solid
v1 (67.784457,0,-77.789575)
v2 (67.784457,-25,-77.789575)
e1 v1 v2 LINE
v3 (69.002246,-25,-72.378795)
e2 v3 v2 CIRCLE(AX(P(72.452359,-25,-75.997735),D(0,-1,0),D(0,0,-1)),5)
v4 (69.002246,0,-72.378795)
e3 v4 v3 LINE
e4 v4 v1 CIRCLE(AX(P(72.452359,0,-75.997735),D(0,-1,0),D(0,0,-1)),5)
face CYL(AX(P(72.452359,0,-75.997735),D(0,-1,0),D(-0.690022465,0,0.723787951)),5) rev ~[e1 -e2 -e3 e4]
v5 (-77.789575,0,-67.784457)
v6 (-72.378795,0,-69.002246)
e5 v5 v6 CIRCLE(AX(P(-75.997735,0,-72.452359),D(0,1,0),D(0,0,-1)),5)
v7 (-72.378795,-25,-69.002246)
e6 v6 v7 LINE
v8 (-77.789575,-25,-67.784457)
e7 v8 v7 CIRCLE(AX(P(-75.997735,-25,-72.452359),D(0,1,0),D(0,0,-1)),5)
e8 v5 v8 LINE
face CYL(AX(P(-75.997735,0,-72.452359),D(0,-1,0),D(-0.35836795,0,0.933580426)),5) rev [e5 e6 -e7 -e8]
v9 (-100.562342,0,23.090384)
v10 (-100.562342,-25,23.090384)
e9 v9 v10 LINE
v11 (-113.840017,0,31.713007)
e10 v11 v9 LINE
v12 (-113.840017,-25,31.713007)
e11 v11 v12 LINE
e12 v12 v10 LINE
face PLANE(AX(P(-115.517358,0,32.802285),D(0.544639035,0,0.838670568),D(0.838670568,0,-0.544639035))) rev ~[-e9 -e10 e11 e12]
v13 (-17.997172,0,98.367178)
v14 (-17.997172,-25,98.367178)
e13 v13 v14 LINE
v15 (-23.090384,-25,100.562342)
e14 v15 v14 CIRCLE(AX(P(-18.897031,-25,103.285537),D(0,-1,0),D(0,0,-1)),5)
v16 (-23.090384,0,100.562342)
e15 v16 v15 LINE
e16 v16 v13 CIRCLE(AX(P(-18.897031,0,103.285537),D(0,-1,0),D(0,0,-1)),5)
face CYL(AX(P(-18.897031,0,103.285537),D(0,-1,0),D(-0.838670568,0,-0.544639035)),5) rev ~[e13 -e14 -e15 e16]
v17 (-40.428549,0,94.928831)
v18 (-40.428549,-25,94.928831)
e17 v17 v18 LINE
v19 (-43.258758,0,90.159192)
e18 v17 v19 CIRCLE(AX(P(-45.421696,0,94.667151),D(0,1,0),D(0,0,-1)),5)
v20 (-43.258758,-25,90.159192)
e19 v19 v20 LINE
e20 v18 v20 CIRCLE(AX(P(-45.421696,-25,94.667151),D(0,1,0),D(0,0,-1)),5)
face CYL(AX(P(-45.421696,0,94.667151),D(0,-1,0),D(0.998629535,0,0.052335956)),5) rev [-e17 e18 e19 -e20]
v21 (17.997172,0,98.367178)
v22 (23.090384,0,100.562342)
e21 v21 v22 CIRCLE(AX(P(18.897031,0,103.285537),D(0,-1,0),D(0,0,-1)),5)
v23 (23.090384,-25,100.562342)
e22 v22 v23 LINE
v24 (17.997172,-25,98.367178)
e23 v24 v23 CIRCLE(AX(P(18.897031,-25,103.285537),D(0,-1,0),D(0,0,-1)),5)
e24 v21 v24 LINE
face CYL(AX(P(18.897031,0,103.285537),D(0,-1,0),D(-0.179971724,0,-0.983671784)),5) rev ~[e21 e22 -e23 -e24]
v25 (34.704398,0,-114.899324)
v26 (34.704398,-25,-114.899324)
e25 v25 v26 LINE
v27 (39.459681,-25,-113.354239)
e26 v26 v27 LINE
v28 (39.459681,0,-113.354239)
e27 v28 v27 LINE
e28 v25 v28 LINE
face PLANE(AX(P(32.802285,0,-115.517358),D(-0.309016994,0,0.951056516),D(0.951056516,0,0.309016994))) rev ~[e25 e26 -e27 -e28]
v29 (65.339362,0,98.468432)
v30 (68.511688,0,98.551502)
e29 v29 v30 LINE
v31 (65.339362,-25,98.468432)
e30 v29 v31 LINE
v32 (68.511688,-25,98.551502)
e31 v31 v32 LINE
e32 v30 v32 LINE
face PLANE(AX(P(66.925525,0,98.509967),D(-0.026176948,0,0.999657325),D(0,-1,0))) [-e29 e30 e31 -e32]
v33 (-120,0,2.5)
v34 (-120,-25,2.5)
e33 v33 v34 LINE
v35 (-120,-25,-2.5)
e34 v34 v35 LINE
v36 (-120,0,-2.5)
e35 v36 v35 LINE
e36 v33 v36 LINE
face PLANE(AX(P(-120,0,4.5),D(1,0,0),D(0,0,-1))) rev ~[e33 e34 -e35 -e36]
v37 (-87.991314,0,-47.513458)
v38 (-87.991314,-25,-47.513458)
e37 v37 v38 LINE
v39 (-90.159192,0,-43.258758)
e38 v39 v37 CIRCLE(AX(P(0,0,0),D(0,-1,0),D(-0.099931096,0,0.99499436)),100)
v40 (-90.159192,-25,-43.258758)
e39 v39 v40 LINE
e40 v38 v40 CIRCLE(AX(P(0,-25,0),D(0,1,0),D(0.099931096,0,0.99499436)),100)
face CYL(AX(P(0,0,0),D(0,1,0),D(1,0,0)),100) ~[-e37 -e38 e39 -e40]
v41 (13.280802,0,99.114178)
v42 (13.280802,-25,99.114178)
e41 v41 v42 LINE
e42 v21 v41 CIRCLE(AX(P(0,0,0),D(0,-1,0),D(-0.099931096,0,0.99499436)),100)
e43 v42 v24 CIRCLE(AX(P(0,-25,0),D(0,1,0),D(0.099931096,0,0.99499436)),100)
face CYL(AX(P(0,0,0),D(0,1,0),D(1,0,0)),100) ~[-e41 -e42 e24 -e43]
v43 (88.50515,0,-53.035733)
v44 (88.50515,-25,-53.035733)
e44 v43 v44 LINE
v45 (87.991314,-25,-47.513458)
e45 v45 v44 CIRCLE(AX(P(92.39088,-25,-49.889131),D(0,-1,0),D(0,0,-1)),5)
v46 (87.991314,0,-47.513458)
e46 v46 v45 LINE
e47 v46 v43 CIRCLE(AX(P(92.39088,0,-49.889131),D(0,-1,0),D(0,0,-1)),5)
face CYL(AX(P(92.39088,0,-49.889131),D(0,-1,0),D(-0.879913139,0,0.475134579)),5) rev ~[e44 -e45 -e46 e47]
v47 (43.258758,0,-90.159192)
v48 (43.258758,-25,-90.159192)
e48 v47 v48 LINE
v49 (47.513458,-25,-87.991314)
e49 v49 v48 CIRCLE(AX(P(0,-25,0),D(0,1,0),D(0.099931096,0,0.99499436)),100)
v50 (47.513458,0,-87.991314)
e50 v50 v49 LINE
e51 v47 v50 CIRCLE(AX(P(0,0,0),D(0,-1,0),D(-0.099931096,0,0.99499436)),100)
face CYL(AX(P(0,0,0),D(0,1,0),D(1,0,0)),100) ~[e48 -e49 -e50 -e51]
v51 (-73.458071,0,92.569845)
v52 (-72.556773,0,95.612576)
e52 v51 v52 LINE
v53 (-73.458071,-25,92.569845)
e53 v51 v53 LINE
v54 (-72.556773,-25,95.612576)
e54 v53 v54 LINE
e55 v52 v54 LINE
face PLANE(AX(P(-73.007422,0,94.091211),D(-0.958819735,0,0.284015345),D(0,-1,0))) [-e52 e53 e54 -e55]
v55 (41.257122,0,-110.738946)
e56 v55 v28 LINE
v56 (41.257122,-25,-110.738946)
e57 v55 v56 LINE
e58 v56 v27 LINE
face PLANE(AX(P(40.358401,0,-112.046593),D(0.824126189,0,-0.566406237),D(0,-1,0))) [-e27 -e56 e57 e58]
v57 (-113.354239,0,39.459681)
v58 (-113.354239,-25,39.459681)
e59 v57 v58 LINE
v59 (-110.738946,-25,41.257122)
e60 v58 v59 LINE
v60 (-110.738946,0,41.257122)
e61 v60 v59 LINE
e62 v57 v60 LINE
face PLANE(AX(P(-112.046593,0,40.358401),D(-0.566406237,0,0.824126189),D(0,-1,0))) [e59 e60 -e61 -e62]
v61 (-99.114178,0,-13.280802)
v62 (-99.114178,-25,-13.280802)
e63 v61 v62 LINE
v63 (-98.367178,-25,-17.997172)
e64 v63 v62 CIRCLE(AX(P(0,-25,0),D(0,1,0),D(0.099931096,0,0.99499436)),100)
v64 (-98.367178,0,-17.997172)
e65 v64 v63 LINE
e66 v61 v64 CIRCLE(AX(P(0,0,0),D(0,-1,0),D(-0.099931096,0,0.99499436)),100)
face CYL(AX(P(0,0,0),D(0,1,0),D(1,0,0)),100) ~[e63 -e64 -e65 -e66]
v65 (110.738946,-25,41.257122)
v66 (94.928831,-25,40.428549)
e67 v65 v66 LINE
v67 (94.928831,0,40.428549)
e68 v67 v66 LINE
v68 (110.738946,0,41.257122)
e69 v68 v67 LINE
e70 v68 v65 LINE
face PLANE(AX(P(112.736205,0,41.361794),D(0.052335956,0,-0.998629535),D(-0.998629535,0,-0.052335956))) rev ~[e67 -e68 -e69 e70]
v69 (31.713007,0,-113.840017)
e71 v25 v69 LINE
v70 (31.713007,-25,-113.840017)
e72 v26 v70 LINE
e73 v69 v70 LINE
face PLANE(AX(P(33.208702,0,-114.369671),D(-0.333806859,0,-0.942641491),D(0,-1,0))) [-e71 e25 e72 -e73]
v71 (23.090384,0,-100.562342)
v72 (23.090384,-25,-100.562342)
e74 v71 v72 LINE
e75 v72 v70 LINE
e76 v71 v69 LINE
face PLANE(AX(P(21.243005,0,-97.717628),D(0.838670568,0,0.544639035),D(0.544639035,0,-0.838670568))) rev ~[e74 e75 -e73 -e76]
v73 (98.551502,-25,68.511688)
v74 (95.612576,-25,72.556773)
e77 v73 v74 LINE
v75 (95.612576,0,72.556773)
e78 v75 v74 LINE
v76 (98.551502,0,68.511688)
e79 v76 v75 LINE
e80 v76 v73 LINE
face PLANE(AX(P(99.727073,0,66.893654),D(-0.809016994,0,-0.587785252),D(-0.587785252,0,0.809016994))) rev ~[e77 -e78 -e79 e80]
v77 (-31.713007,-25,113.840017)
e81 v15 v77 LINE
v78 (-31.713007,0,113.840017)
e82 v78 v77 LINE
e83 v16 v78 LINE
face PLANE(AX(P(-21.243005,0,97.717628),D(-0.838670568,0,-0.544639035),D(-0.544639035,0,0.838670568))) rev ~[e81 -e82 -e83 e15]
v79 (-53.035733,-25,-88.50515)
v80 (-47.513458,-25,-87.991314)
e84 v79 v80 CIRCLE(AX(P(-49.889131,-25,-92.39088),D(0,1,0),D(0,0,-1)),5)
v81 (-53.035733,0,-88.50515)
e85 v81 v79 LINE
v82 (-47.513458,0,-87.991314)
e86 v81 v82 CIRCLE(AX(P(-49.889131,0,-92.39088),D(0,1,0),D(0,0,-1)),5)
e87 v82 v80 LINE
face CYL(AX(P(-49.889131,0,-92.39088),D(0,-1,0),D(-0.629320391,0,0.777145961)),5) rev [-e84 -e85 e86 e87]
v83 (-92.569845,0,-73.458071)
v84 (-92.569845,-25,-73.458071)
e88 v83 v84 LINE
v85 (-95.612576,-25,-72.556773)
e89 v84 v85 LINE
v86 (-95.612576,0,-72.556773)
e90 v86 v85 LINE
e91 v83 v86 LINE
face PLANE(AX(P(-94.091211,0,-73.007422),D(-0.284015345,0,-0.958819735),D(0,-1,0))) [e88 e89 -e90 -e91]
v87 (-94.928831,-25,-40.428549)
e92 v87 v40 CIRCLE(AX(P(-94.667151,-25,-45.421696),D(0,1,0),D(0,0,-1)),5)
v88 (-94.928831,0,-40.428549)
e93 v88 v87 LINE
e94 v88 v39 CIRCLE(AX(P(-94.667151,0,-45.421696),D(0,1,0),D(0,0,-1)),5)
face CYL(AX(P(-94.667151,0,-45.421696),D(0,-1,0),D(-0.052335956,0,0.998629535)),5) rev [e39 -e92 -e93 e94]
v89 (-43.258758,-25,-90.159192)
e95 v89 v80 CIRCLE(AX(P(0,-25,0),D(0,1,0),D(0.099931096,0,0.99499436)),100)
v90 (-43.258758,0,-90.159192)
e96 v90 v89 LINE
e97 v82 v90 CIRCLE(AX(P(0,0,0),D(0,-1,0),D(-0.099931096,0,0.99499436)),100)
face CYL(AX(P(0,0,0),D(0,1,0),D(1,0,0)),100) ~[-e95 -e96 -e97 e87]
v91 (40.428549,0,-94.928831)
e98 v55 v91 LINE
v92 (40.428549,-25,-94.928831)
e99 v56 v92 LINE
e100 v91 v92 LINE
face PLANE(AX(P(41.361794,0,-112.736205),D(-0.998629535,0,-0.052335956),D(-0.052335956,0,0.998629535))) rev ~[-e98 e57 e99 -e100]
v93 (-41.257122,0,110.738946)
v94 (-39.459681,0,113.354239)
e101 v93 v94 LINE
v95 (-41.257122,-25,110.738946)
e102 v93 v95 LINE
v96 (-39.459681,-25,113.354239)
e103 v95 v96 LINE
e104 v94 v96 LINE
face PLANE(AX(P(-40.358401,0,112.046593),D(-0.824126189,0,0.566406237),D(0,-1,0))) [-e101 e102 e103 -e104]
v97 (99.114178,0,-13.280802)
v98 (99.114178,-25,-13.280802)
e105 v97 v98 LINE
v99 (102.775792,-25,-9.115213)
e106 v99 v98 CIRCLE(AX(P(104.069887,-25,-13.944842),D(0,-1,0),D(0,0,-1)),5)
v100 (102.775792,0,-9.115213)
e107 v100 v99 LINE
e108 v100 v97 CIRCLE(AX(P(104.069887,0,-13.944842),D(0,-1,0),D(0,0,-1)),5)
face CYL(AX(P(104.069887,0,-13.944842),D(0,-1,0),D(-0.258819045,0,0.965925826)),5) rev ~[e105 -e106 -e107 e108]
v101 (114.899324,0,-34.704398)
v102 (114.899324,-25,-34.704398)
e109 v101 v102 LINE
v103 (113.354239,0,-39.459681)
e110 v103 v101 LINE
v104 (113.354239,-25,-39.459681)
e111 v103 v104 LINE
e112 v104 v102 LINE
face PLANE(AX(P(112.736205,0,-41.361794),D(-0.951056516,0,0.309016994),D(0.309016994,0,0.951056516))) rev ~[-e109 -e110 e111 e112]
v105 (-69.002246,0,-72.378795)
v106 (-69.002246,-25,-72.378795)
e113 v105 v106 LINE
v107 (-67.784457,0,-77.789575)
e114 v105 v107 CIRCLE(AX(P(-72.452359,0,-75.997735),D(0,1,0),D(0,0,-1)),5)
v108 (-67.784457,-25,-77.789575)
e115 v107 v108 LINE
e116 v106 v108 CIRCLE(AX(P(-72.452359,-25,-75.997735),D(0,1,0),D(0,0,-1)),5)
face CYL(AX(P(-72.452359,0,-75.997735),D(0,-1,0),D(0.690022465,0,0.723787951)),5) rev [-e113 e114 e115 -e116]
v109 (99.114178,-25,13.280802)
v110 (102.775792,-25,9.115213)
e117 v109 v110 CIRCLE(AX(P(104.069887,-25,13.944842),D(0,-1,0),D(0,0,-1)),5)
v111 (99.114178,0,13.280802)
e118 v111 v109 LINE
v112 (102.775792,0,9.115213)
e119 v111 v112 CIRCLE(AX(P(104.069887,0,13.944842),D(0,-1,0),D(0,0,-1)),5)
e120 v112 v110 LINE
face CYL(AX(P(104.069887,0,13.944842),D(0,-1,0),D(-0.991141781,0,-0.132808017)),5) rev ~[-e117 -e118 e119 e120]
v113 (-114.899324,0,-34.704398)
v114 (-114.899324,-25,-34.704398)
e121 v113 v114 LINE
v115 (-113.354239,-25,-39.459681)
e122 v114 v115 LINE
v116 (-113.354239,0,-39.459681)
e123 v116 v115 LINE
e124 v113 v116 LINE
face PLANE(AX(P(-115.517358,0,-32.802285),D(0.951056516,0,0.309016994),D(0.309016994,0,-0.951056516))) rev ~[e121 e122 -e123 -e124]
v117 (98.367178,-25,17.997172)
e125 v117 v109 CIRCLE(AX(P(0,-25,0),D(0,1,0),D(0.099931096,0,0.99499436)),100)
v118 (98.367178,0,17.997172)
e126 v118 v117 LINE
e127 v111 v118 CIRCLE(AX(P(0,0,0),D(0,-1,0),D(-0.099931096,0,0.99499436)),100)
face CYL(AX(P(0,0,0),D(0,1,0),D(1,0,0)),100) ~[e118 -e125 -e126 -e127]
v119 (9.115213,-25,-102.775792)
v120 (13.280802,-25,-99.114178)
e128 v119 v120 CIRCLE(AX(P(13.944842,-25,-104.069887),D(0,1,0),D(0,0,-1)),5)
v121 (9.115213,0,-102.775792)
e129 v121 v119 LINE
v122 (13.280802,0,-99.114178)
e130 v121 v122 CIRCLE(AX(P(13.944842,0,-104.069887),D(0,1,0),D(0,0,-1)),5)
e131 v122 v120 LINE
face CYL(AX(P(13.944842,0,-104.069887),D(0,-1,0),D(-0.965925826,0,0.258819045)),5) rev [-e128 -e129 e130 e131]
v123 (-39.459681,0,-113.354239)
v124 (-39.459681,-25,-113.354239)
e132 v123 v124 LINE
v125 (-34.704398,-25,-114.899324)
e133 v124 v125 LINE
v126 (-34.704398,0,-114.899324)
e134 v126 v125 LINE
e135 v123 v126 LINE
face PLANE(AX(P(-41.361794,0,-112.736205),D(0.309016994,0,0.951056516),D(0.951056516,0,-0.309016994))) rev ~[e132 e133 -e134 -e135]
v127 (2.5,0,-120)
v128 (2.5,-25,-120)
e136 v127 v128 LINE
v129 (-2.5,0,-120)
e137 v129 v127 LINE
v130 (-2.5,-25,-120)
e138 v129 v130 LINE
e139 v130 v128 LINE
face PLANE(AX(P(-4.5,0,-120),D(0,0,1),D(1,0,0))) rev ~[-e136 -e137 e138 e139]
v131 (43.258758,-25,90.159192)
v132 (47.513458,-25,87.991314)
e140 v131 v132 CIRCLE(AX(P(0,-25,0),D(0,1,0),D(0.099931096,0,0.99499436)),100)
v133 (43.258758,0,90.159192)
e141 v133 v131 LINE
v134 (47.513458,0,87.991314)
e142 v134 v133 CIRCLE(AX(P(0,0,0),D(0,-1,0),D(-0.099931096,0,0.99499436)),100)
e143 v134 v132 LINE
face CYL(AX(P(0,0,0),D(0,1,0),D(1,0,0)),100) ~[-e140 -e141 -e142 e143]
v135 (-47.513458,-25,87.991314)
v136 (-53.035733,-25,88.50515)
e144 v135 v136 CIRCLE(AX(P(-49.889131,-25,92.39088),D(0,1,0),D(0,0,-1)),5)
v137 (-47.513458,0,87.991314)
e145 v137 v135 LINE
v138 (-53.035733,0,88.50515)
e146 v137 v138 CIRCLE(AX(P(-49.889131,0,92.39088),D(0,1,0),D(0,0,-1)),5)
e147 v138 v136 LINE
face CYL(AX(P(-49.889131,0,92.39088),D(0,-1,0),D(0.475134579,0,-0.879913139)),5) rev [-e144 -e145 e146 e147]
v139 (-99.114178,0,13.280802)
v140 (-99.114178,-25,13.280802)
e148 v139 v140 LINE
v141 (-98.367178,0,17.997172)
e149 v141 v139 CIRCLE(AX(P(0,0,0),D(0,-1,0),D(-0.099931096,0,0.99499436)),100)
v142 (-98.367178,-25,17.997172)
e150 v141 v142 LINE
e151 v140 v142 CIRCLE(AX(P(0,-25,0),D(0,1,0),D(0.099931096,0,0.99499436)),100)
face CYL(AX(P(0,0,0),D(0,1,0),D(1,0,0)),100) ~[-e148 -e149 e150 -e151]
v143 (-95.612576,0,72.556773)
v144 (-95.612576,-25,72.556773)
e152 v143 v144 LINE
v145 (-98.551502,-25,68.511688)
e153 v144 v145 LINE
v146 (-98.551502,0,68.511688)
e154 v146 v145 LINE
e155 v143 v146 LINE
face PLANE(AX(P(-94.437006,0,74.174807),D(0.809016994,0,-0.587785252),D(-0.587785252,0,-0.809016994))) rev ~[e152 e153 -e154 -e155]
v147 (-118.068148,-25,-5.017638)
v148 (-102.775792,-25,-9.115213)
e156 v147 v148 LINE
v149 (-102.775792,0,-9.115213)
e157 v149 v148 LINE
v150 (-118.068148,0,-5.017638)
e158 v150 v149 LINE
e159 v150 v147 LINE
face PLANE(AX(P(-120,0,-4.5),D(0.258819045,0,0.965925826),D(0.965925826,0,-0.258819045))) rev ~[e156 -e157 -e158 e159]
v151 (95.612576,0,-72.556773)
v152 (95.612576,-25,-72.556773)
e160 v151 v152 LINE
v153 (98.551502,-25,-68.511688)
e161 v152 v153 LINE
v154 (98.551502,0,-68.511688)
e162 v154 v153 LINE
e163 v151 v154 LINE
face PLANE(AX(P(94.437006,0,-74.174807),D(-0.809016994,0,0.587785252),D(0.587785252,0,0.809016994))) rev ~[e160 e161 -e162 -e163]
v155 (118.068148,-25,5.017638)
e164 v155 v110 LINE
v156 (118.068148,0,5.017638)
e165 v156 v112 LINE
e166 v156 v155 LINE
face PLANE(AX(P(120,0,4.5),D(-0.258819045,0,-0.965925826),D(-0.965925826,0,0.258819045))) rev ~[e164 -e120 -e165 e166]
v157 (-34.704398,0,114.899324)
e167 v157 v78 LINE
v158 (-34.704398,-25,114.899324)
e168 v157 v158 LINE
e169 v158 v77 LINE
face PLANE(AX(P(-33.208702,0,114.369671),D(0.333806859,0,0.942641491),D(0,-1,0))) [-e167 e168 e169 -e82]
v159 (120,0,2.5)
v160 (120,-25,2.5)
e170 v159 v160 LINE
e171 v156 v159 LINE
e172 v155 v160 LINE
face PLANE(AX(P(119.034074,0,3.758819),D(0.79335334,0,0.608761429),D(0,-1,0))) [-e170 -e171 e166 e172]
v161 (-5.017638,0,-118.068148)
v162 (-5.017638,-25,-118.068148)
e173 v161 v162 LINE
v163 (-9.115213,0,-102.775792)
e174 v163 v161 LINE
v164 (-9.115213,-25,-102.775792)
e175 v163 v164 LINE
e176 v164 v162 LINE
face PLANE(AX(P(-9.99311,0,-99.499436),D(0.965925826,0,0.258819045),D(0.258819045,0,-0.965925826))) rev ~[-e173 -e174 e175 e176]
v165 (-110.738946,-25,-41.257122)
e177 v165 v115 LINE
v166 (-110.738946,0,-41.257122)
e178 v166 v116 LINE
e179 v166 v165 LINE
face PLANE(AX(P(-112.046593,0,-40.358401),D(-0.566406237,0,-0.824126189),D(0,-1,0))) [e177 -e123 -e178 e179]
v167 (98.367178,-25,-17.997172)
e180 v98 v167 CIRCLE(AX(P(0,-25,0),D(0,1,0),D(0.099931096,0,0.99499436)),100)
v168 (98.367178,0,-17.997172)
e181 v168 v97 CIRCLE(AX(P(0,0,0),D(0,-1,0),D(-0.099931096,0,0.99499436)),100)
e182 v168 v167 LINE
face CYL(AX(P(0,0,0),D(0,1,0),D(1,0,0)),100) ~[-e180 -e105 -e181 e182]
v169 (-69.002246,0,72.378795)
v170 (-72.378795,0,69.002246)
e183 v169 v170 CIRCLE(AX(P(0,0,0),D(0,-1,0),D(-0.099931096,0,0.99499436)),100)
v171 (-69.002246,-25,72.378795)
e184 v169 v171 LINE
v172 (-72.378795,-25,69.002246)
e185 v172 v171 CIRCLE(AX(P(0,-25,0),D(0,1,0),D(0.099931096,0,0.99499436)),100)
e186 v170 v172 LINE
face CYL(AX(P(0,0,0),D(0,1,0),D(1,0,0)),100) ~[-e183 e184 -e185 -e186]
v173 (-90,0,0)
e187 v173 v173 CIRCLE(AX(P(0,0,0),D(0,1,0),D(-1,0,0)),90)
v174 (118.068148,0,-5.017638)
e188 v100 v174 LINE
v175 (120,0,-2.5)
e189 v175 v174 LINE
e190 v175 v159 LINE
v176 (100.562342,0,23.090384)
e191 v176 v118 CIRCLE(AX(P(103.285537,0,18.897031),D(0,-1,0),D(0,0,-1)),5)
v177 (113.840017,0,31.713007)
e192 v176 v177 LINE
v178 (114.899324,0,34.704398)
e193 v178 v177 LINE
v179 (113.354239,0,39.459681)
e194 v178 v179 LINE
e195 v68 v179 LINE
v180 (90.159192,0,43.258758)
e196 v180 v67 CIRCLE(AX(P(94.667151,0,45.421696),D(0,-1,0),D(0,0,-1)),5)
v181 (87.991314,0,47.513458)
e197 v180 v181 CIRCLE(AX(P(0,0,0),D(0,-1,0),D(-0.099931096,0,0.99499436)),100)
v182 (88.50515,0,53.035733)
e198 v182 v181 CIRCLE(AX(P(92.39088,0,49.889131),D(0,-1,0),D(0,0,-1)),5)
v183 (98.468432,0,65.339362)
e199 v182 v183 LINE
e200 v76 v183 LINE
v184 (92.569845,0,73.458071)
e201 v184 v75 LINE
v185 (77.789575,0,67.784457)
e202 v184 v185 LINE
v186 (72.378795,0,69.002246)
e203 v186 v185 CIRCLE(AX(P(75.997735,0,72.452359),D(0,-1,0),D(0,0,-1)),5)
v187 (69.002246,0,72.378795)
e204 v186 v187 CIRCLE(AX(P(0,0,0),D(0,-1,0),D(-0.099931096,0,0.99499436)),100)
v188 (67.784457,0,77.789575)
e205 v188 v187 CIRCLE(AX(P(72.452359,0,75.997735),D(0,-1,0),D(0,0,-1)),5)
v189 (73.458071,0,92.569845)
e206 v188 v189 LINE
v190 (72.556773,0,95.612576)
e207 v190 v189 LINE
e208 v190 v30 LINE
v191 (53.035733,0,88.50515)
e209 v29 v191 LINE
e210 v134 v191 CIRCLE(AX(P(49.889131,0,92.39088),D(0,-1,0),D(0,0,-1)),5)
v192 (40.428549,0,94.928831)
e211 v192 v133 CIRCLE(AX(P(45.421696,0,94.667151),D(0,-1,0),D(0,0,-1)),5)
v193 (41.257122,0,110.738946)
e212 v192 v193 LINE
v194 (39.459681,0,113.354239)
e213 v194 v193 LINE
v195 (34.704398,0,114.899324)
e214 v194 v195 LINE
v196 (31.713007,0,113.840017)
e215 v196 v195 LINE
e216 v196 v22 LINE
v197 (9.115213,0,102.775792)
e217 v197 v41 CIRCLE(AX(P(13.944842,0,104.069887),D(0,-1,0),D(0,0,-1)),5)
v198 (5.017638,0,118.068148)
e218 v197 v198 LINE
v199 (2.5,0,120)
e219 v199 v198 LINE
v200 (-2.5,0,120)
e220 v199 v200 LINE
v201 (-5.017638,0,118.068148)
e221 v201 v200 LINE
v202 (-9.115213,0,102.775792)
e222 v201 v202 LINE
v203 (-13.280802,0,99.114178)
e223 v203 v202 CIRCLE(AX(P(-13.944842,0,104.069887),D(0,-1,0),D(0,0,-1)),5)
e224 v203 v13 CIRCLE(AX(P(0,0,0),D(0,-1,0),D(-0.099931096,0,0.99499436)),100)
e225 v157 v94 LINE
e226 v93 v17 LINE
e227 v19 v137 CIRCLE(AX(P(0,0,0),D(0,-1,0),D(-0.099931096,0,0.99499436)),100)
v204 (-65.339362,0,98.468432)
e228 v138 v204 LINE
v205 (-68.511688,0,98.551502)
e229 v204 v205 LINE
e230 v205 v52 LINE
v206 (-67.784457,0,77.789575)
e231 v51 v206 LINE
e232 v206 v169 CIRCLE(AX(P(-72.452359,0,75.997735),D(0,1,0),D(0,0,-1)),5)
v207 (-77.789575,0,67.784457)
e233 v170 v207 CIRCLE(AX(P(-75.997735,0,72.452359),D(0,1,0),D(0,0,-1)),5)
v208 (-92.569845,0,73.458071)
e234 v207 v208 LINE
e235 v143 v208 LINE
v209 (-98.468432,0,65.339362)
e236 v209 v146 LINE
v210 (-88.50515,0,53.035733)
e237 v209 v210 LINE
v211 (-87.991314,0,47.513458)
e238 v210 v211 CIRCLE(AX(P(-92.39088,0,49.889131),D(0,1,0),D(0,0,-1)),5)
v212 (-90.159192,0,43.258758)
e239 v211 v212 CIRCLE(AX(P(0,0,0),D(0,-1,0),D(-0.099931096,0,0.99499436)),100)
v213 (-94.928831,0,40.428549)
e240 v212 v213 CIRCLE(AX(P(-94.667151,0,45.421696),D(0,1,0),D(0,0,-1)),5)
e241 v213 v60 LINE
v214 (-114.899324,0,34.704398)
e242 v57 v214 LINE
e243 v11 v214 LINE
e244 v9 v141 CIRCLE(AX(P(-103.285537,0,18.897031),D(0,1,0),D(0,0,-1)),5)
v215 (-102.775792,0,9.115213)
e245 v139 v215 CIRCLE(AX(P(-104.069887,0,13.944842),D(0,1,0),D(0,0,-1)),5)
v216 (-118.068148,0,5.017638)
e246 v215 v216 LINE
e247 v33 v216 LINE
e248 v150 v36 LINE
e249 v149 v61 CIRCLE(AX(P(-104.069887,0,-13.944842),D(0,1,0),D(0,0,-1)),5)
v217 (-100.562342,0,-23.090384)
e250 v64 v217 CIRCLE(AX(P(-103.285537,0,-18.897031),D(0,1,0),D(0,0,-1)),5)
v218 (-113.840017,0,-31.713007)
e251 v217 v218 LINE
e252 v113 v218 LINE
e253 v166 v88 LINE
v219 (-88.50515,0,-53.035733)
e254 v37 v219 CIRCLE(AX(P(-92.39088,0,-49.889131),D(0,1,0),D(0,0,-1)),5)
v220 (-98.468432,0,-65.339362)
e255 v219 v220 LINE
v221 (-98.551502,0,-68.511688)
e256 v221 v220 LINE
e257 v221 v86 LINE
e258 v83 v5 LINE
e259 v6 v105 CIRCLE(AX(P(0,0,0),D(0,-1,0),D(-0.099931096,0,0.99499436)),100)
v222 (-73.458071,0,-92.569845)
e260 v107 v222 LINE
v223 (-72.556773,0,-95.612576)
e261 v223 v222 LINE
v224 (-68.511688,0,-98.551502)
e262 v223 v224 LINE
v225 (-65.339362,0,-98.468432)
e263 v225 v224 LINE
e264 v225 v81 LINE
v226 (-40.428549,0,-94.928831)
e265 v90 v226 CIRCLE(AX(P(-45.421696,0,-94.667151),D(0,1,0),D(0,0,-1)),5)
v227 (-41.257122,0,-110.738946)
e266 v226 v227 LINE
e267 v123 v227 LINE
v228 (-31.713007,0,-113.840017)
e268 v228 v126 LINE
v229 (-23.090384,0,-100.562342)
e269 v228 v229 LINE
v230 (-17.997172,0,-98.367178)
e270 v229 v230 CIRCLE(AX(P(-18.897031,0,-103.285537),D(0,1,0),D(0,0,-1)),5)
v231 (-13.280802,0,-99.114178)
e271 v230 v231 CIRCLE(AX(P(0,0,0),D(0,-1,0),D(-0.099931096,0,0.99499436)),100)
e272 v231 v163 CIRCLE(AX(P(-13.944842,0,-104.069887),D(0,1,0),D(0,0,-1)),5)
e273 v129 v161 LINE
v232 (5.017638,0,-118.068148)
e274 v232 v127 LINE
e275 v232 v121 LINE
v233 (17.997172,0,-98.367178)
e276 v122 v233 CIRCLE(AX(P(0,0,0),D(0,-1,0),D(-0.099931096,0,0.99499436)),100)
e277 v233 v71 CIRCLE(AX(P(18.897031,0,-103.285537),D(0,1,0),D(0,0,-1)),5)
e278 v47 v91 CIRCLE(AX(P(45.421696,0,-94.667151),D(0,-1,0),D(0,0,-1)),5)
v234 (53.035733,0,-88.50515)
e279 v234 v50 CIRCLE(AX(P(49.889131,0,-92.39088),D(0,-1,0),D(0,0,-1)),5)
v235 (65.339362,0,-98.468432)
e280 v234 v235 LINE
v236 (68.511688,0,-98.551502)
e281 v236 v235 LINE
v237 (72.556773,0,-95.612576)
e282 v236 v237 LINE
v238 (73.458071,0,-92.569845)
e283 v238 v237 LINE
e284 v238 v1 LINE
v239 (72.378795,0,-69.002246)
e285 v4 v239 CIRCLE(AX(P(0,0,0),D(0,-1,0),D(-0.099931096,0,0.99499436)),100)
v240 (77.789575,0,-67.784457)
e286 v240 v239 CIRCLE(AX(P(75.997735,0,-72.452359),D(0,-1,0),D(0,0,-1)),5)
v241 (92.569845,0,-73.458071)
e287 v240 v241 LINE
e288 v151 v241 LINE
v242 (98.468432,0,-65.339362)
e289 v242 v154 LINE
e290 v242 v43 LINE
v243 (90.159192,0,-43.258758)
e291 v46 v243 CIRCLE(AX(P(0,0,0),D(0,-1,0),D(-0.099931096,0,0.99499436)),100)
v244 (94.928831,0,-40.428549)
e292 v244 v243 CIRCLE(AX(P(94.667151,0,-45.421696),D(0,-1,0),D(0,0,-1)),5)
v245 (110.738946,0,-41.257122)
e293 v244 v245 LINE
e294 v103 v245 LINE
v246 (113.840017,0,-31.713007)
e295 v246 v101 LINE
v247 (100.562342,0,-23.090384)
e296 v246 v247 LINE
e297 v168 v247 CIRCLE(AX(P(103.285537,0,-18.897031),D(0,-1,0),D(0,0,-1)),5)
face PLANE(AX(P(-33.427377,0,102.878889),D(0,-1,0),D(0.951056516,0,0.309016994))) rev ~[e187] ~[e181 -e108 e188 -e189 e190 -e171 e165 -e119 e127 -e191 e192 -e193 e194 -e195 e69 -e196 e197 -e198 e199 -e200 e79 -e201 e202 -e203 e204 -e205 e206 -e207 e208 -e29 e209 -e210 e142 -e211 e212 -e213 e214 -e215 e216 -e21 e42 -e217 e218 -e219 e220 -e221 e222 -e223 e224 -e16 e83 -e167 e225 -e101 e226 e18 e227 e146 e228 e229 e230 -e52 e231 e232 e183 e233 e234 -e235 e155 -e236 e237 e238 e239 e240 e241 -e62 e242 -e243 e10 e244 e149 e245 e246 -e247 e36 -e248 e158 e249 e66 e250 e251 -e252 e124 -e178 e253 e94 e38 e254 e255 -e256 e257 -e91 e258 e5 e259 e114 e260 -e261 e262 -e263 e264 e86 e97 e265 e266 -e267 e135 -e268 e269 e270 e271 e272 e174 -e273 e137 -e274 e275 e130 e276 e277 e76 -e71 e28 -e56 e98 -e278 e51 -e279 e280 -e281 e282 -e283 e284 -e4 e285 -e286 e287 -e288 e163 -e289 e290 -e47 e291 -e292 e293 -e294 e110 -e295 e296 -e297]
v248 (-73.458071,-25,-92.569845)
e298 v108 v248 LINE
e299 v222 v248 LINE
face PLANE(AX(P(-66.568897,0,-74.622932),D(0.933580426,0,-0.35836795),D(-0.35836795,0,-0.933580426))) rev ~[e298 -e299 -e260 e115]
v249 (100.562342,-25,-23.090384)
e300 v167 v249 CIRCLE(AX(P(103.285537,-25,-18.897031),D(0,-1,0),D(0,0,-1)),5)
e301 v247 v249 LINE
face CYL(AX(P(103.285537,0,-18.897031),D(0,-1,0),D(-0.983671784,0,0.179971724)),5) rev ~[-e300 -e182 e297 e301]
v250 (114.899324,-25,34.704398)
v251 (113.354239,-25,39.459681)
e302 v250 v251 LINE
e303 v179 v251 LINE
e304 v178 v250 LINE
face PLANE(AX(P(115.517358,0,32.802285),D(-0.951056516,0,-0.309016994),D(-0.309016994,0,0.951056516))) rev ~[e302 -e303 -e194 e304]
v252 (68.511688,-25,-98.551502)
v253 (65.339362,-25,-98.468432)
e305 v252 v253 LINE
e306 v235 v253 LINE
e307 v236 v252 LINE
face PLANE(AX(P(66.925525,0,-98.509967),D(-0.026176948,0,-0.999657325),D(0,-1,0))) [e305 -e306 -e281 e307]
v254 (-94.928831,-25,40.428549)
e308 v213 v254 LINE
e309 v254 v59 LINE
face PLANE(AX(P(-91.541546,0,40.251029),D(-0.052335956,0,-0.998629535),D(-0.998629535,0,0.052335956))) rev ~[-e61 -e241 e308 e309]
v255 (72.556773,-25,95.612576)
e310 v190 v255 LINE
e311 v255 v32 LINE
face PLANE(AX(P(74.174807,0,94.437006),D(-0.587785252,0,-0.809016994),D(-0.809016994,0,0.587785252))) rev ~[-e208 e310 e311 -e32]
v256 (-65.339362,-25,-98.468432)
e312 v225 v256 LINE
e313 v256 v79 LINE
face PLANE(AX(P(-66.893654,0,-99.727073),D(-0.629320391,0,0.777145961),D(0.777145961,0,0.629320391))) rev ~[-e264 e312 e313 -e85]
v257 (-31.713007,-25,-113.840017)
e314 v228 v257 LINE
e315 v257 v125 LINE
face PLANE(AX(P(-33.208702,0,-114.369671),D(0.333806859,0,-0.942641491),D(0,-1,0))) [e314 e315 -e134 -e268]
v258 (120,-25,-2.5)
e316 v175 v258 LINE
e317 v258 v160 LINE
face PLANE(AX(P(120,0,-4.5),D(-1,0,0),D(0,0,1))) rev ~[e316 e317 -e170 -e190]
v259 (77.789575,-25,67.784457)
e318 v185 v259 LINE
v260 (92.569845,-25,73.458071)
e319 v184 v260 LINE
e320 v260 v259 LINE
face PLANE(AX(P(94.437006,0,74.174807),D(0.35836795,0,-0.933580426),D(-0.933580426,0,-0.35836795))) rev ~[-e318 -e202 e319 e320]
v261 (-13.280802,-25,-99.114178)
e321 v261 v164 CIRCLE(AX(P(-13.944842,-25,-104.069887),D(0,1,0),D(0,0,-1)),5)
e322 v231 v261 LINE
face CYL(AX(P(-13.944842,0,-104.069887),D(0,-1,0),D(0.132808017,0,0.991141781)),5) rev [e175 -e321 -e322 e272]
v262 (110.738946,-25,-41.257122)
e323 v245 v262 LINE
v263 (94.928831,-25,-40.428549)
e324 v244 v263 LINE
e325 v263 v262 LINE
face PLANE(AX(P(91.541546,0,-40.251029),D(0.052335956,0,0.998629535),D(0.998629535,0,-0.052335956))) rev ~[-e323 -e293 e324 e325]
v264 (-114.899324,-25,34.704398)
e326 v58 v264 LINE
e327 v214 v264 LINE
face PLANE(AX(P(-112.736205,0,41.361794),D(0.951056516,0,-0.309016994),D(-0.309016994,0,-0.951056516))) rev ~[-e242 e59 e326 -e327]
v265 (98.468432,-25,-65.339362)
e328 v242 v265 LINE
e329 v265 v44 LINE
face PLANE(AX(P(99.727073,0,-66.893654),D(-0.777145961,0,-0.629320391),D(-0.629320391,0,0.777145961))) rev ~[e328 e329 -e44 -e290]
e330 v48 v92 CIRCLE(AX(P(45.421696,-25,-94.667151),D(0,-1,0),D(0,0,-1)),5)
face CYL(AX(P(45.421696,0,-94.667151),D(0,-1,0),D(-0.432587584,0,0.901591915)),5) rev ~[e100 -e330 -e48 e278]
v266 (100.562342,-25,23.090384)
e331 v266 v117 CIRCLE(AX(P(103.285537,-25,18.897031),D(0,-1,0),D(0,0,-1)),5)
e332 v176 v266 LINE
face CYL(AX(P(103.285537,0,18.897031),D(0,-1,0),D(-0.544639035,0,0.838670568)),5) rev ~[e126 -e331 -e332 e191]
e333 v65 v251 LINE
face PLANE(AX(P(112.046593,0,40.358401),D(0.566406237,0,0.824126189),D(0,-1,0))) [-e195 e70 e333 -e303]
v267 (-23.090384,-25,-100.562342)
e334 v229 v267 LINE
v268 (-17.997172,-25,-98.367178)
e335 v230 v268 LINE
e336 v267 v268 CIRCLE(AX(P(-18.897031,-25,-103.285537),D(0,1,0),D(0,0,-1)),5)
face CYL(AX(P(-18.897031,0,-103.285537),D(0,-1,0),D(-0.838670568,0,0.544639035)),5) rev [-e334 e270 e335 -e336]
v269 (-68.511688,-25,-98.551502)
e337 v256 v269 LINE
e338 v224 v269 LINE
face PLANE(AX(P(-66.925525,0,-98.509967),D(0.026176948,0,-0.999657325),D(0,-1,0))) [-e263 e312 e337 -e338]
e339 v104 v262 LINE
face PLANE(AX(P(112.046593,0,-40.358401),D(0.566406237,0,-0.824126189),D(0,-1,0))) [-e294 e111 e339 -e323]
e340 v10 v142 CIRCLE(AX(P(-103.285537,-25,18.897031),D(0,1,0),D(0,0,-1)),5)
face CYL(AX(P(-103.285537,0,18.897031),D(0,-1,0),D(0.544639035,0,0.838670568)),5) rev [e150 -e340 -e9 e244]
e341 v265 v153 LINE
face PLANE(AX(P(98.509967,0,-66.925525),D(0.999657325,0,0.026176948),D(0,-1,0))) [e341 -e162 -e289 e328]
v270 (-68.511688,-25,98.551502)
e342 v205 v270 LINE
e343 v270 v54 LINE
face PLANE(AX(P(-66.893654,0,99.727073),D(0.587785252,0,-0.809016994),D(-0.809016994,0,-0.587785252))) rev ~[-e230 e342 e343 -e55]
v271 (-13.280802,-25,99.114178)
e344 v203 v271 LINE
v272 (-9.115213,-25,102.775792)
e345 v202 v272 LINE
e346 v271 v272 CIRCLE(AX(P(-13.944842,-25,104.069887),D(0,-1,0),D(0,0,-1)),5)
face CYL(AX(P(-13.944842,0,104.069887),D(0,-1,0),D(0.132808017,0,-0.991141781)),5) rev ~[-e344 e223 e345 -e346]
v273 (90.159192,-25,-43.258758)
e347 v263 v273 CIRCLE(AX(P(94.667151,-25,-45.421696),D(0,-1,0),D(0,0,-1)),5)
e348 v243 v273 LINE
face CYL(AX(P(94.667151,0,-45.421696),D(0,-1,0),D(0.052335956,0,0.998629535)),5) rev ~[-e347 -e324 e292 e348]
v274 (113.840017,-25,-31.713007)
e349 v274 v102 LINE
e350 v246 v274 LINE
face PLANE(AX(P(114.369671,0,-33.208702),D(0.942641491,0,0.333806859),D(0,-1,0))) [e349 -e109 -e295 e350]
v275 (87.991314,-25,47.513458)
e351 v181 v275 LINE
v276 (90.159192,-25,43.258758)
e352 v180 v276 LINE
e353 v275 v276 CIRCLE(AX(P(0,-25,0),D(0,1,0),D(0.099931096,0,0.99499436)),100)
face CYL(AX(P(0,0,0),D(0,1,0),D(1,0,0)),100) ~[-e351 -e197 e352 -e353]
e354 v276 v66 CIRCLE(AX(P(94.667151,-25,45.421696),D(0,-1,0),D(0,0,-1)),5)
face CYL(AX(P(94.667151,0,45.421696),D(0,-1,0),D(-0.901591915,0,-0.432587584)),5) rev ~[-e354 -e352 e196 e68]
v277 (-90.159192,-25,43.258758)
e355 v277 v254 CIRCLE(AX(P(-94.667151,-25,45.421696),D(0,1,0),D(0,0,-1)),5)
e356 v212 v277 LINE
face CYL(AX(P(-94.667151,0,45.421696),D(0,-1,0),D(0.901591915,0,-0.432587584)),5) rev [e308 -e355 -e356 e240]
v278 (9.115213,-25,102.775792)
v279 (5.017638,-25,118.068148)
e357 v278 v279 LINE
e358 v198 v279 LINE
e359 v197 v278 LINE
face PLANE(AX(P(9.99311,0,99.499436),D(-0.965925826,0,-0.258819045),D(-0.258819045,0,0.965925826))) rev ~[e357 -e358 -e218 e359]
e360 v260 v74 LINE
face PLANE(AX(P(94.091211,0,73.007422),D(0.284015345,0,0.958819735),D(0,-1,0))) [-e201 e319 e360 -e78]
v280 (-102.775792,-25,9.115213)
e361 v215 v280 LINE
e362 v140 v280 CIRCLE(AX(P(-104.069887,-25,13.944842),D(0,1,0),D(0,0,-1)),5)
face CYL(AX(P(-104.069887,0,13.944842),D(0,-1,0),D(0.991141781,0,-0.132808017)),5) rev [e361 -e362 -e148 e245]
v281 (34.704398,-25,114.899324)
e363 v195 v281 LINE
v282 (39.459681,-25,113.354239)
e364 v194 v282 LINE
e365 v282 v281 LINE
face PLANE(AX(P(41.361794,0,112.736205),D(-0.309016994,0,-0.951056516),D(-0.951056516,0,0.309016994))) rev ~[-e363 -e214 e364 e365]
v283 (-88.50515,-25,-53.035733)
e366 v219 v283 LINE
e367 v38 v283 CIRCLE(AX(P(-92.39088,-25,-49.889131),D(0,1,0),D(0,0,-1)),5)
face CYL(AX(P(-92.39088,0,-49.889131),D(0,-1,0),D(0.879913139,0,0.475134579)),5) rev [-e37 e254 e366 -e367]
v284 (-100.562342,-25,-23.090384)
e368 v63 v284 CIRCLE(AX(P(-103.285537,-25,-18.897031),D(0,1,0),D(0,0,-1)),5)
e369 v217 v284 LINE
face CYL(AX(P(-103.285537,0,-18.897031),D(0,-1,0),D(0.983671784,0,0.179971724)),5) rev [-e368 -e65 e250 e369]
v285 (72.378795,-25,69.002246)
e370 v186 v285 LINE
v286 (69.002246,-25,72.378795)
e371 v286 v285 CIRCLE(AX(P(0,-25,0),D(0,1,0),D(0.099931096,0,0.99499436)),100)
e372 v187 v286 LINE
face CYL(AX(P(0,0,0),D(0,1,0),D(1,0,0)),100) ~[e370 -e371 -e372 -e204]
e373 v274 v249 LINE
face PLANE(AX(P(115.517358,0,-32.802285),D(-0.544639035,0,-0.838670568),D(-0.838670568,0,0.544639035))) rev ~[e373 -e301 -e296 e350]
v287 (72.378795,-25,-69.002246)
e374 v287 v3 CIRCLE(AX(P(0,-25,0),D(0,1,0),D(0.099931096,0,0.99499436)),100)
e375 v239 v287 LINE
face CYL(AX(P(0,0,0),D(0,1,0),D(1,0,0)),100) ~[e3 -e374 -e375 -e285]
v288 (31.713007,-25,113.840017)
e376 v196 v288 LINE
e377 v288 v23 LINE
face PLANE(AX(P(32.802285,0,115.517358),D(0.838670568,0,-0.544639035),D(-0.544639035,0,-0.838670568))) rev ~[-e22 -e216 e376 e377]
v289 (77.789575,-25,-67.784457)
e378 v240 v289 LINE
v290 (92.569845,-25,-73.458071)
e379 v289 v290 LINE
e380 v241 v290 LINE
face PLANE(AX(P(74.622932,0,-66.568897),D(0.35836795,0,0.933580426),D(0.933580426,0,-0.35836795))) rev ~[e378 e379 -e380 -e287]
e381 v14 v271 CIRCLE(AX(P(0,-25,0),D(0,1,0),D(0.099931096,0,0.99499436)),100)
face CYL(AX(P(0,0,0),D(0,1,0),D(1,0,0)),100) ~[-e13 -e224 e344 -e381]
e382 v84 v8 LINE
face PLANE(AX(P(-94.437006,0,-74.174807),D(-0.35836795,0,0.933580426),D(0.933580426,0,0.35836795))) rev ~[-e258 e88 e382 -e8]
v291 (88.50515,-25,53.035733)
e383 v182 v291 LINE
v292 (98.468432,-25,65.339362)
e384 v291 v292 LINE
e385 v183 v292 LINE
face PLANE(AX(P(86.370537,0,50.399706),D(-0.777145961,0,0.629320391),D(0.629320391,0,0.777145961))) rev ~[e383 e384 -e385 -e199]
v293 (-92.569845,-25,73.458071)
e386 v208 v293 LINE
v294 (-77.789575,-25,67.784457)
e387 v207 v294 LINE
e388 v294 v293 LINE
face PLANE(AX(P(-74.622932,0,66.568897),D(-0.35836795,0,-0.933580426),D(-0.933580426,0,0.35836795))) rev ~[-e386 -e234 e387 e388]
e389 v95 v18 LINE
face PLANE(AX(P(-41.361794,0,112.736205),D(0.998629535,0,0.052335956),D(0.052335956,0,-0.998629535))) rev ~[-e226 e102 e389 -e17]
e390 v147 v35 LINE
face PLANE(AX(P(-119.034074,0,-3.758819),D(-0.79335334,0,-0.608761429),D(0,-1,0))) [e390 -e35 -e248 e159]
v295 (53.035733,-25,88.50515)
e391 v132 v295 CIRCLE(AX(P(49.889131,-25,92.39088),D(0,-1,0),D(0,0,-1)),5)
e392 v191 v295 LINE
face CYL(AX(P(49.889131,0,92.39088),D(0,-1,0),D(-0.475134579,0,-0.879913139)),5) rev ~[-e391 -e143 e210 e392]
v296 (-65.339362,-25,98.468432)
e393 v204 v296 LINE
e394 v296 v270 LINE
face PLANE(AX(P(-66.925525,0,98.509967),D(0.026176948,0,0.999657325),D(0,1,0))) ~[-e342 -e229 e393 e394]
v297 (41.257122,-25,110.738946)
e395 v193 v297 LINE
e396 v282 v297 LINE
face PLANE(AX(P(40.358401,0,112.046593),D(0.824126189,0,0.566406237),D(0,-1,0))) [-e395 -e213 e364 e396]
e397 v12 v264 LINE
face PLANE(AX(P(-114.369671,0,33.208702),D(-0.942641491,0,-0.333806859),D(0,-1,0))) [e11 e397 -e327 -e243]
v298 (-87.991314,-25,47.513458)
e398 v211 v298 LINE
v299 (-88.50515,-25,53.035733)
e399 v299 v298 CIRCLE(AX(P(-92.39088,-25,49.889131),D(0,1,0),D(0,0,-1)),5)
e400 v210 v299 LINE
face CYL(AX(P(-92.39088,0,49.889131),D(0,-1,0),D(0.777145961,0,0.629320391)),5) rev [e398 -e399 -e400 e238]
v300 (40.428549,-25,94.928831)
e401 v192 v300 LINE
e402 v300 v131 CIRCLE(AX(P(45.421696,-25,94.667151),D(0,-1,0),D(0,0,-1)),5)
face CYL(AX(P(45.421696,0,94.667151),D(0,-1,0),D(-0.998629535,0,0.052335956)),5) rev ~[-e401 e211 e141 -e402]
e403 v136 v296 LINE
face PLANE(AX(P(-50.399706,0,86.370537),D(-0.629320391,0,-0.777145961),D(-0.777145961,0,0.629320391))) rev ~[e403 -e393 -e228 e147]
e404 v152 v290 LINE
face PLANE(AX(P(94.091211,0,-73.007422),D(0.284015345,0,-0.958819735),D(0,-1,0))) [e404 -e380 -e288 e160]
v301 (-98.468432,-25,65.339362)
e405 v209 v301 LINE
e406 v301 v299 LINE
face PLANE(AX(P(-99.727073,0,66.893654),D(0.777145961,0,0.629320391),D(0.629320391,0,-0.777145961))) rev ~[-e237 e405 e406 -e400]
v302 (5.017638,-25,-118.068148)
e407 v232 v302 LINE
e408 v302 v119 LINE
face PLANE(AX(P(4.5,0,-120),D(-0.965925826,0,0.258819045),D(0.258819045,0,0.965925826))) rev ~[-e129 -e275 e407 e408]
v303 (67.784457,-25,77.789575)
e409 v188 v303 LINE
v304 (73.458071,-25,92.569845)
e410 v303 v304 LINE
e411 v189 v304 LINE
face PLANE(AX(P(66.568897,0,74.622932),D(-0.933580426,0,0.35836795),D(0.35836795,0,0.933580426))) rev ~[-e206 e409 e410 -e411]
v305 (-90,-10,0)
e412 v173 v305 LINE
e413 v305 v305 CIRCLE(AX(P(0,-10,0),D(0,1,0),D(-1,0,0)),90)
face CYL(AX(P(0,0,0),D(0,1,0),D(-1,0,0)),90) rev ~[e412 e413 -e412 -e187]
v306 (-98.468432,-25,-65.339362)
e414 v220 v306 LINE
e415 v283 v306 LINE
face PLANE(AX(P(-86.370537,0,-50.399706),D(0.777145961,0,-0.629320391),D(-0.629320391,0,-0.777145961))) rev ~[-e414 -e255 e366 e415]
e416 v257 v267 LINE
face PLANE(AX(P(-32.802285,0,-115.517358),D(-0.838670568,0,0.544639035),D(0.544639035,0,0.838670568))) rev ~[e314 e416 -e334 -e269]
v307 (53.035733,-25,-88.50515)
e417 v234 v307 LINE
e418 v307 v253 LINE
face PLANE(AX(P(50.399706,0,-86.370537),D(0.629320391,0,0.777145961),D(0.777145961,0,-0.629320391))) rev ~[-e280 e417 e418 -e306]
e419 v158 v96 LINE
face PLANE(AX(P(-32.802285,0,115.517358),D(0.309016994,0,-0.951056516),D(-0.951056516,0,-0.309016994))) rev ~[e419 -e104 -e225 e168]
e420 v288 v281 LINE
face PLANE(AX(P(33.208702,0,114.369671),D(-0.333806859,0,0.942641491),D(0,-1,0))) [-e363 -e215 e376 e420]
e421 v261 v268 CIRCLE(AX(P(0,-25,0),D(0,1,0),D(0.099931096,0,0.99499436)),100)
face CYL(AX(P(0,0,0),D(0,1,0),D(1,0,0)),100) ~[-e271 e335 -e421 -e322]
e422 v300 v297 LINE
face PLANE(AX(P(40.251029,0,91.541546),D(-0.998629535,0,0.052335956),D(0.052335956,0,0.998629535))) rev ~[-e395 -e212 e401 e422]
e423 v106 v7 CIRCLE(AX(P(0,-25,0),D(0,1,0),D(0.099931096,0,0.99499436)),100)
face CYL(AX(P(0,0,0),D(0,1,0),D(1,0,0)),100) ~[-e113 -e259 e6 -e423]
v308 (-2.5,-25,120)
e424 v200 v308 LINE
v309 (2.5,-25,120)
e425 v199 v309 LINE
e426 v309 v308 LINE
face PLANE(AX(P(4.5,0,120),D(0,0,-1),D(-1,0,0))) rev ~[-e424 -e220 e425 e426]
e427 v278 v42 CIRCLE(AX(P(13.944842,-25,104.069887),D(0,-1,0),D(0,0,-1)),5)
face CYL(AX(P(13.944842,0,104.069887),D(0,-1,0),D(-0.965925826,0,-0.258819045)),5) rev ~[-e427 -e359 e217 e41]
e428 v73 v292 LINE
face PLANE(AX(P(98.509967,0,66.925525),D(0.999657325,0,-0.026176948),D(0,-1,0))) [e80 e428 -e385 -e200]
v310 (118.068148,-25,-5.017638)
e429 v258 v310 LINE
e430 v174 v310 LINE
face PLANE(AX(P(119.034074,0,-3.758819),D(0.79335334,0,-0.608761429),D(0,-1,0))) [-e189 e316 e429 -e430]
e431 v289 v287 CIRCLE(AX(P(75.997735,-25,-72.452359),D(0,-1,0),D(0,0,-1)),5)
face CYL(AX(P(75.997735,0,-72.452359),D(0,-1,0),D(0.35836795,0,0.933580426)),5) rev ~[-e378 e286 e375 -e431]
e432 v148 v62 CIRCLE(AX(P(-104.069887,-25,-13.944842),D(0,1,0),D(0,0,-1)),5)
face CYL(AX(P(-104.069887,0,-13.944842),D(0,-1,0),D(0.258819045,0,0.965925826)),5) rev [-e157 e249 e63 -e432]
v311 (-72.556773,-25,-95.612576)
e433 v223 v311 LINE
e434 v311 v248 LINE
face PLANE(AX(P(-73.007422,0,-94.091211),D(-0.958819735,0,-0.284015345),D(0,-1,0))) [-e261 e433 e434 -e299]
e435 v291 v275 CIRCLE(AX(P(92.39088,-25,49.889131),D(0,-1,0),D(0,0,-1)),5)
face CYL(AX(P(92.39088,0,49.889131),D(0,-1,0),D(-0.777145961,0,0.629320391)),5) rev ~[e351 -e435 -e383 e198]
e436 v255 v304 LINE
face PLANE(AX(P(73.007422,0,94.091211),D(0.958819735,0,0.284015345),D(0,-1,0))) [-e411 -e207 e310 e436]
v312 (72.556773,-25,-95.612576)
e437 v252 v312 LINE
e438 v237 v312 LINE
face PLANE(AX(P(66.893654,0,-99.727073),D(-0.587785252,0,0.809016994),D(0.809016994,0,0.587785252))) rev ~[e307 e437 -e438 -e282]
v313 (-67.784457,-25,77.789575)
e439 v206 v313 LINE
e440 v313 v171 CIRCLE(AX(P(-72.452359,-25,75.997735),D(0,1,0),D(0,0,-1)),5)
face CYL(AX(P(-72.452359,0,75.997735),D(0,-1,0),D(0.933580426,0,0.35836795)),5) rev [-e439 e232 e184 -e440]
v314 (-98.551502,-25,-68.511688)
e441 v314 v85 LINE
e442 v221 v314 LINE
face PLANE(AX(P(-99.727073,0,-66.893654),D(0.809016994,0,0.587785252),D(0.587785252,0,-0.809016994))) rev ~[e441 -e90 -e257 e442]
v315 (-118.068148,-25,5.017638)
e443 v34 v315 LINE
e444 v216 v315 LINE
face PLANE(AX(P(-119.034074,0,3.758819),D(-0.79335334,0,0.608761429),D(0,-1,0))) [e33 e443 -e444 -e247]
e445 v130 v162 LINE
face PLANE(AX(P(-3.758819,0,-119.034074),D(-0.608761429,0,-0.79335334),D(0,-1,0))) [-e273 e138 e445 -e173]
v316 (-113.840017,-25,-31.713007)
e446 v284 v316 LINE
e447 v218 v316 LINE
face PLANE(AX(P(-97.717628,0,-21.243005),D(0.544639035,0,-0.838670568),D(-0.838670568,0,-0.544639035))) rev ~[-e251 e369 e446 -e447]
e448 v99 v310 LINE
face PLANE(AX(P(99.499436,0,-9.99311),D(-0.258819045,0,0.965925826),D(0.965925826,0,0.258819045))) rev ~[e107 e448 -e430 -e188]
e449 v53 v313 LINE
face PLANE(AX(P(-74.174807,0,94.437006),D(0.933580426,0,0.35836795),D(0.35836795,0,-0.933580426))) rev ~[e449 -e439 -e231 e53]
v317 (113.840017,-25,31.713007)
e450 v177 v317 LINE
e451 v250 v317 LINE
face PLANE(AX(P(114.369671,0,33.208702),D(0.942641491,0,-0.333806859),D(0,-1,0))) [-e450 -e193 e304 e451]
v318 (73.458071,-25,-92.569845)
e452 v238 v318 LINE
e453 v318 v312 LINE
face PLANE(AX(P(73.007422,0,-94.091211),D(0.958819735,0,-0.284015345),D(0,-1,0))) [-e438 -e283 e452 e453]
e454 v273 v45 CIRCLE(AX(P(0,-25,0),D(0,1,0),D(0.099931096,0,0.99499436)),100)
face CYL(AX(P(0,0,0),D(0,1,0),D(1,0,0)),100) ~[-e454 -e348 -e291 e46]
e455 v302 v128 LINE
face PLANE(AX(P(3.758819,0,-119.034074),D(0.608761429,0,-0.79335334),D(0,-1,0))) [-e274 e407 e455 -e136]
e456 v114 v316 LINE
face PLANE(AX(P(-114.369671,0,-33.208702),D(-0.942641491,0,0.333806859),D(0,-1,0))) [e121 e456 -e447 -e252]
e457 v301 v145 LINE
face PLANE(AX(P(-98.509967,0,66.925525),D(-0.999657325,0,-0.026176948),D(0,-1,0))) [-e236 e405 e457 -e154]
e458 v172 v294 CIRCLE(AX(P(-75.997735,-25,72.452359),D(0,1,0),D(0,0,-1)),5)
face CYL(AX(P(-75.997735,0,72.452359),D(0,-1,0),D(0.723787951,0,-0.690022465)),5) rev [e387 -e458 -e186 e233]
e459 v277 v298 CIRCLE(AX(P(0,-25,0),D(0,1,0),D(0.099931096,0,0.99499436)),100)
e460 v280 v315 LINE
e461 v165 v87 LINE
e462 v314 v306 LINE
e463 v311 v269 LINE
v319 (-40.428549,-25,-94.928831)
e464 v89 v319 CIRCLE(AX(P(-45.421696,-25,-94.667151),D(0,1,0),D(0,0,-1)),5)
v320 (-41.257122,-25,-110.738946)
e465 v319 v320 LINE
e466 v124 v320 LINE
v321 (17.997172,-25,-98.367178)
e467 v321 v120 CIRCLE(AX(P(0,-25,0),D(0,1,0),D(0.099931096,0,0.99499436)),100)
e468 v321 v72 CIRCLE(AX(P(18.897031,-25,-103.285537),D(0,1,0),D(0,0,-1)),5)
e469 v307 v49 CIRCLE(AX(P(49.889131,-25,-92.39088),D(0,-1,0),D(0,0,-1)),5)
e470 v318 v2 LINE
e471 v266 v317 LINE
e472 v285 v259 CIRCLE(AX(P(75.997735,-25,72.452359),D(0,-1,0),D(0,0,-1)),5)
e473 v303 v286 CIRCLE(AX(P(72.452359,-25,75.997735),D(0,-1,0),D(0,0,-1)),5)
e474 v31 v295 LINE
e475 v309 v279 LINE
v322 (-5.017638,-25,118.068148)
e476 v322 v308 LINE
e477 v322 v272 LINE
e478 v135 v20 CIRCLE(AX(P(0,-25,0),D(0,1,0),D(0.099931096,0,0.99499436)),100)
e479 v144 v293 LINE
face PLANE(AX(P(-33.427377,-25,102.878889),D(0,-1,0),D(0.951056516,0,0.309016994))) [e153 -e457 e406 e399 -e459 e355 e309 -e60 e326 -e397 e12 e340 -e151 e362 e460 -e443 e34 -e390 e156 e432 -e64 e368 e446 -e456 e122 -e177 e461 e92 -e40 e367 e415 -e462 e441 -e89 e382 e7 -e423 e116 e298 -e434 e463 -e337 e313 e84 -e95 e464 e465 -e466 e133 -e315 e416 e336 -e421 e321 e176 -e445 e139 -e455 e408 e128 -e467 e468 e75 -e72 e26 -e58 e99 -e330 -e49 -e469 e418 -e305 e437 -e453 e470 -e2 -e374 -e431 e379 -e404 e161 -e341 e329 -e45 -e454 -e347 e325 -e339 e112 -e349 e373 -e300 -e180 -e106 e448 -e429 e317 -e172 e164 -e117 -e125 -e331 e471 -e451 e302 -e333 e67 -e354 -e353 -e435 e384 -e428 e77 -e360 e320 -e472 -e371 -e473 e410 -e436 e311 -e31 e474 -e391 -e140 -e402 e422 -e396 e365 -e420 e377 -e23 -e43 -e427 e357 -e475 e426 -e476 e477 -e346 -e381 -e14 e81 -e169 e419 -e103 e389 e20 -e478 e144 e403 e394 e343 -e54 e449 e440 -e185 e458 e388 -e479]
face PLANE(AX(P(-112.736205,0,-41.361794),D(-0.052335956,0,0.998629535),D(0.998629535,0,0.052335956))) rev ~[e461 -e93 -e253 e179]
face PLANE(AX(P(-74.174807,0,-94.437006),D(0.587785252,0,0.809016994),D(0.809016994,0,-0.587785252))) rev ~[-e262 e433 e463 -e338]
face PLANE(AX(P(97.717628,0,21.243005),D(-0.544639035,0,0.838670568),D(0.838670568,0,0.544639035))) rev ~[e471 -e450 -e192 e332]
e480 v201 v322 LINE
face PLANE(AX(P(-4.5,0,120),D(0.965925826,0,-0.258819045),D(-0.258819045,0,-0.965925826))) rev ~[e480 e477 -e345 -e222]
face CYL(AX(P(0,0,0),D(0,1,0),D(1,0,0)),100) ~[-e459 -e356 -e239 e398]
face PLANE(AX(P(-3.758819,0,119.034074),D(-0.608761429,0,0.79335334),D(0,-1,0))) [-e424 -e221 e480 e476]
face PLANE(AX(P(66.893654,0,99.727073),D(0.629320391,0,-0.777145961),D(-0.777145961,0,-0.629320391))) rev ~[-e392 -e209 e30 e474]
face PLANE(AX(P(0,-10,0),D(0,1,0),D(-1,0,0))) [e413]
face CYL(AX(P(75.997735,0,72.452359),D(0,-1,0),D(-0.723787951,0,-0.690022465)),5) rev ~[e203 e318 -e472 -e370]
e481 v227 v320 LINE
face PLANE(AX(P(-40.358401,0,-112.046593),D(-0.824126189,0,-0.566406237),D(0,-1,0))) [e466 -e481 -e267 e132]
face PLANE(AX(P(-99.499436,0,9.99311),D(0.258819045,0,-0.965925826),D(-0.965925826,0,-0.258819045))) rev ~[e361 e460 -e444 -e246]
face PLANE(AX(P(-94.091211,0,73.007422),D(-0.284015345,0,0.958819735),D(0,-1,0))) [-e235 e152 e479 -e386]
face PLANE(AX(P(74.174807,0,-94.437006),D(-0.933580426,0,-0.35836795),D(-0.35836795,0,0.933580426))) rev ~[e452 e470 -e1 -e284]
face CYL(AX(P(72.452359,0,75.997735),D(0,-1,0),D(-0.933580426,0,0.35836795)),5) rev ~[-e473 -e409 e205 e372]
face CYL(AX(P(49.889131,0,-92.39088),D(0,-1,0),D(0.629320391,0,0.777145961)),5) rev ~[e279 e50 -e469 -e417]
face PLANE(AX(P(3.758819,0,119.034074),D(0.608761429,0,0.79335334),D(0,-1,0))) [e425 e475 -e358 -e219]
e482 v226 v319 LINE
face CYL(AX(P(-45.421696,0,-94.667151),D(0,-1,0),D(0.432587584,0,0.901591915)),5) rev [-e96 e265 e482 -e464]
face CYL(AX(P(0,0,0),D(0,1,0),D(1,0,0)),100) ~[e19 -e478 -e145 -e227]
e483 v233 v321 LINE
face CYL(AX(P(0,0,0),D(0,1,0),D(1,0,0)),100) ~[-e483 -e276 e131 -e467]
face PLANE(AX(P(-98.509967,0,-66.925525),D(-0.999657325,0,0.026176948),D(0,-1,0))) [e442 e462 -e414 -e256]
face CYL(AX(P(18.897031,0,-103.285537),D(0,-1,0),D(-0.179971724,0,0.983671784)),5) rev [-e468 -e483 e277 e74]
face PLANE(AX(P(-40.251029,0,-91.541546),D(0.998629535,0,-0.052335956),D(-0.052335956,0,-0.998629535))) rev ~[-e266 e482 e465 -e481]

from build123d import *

# Parameters (mm, degrees)
F0_R            = 100
F1_DEPTH        = 25
F3_DEPTH        = 25
F3_COPIES_COUNT = 20
F4_SIZE         = 2
F5_R            = 5
F6_R            = 90
F7_DEPTH        = 10


# Not quite as in the source:
# - a pattern or mirror of a feature is missing from the dataset's text; its kind, count and spacing are read off the source's solid


with BuildPart() as f1:
    # F0 (on Front) → F1 (new body)
    with BuildSketch(Plane.XZ):
        Circle(F0_R)
    extrude(amount=F1_DEPTH)

    # F2 (on Front) → F3 (join)
    with BuildSketch(Plane.XZ):
        Polygon((-4.5, 120), (-9.9931095726, 99.4994359837), (9.9931095726, 99.4994359837), (4.5, 120), align=None)
    f3 = extrude(amount=F3_DEPTH)

    # F3_copies: F3 ×20 about axis
    f3_copies_axis = Axis((0, 0, 0), (0, 1, 0))
    for i in range(1, F3_COPIES_COUNT):
        add(f3.rotate(f3_copies_axis, i * 360 / F3_COPIES_COUNT))

    # F4
    f4_edges = [f1.edges().sort_by_distance(p)[0] for p in [
        (-4.5, -12.5, 120),
        (4.5, -12.5, 120),
        (-32.802285, -12.5, 115.517358),
        (115.517358, -12.5, 32.802285),
        (120, -12.5, 4.5),
        (120, -12.5, -4.5),
        (115.517358, -12.5, -32.802285),
        (112.736205, -12.5, -41.361794),
        (99.727073, -12.5, -66.893654),
        (94.437006, -12.5, -74.174807),
        (74.174807, -12.5, -94.437006),
        (66.893654, -12.5, -99.727073),
        (41.361794, -12.5, -112.736205),
        (32.802285, -12.5, -115.517358),
        (4.5, -12.5, -120),
        (-4.5, -12.5, -120),
        (-32.802285, -12.5, -115.517358),
        (-41.361794, -12.5, -112.736205),
        (-66.893654, -12.5, -99.727073),
        (-74.174807, -12.5, -94.437006),
        (-94.437006, -12.5, -74.174807),
        (-99.727073, -12.5, -66.893654),
        (-112.736205, -12.5, -41.361794),
        (-115.517358, -12.5, -32.802285),
        (-120, -12.5, -4.5),
        (-120, -12.5, 4.5),
        (-115.517358, -12.5, 32.802285),
        (-112.736205, -12.5, 41.361794),
        (-99.727073, -12.5, 66.893654),
        (-94.437006, -12.5, 74.174807),
        (-74.174807, -12.5, 94.437006),
        (-66.893654, -12.5, 99.727073),
        (32.802285, -12.5, 115.517358),
        (41.361794, -12.5, 112.736205),
        (66.893654, -12.5, 99.727073),
        (74.174807, -12.5, 94.437006),
        (94.437006, -12.5, 74.174807),
        (99.727073, -12.5, 66.893654),
        (112.736205, -12.5, 41.361794),
        (-41.361794, -12.5, 112.736205),
    ]]
    chamfer(f4_edges, length=F4_SIZE)

    # F5
    f5_edges = [f1.edges().sort_by_distance(p)[0] for p in [
        (-9.99311, -12.5, 99.499436),
        (9.99311, -12.5, 99.499436),
        (97.717628, -12.5, 21.243005),
        (99.499436, -12.5, 9.99311),
        (91.541546, -12.5, 40.251029),
        (86.370537, -12.5, 50.399706),
        (99.499436, -12.5, -9.99311),
        (97.717628, -12.5, -21.243005),
        (74.622932, -12.5, 66.568897),
        (66.568897, -12.5, 74.622932),
        (91.541546, -12.5, -40.251029),
        (86.370537, -12.5, -50.399706),
        (50.399706, -12.5, 86.370537),
        (40.251029, -12.5, 91.541546),
        (74.622932, -12.5, -66.568897),
        (66.568897, -12.5, -74.622932),
        (21.243005, -12.5, 97.717628),
        (50.399706, -12.5, -86.370537),
        (40.251029, -12.5, -91.541546),
        (-21.243005, -12.5, 97.717628),
        (21.243005, -12.5, -97.717628),
        (9.99311, -12.5, -99.499436),
        (-40.251029, -12.5, 91.541546),
        (-50.399706, -12.5, 86.370537),
        (-9.99311, -12.5, -99.499436),
        (-21.243005, -12.5, -97.717628),
        (-66.568897, -12.5, 74.622932),
        (-74.622932, -12.5, 66.568897),
        (-40.251029, -12.5, -91.541546),
        (-50.399706, -12.5, -86.370537),
        (-86.370537, -12.5, 50.399706),
        (-91.541546, -12.5, 40.251029),
        (-66.568897, -12.5, -74.622932),
        (-74.622932, -12.5, -66.568897),
        (-97.717628, -12.5, 21.243005),
        (-99.499436, -12.5, 9.99311),
        (-86.370537, -12.5, -50.399706),
        (-91.541546, -12.5, -40.251029),
        (-99.499436, -12.5, -9.99311),
        (-97.717628, -12.5, -21.243005),
    ]]
    fillet(f5_edges, radius=F5_R)

    # F6 (on face) → F7 (cut)
    with BuildSketch(Plane(origin=(0, 0, 0), x_dir=(-1, 0, 0), z_dir=(0, 1, 0))):
        Circle(F6_R)
    extrude(amount=-F7_DEPTH, mode=Mode.SUBTRACT)


solid = f1.part
